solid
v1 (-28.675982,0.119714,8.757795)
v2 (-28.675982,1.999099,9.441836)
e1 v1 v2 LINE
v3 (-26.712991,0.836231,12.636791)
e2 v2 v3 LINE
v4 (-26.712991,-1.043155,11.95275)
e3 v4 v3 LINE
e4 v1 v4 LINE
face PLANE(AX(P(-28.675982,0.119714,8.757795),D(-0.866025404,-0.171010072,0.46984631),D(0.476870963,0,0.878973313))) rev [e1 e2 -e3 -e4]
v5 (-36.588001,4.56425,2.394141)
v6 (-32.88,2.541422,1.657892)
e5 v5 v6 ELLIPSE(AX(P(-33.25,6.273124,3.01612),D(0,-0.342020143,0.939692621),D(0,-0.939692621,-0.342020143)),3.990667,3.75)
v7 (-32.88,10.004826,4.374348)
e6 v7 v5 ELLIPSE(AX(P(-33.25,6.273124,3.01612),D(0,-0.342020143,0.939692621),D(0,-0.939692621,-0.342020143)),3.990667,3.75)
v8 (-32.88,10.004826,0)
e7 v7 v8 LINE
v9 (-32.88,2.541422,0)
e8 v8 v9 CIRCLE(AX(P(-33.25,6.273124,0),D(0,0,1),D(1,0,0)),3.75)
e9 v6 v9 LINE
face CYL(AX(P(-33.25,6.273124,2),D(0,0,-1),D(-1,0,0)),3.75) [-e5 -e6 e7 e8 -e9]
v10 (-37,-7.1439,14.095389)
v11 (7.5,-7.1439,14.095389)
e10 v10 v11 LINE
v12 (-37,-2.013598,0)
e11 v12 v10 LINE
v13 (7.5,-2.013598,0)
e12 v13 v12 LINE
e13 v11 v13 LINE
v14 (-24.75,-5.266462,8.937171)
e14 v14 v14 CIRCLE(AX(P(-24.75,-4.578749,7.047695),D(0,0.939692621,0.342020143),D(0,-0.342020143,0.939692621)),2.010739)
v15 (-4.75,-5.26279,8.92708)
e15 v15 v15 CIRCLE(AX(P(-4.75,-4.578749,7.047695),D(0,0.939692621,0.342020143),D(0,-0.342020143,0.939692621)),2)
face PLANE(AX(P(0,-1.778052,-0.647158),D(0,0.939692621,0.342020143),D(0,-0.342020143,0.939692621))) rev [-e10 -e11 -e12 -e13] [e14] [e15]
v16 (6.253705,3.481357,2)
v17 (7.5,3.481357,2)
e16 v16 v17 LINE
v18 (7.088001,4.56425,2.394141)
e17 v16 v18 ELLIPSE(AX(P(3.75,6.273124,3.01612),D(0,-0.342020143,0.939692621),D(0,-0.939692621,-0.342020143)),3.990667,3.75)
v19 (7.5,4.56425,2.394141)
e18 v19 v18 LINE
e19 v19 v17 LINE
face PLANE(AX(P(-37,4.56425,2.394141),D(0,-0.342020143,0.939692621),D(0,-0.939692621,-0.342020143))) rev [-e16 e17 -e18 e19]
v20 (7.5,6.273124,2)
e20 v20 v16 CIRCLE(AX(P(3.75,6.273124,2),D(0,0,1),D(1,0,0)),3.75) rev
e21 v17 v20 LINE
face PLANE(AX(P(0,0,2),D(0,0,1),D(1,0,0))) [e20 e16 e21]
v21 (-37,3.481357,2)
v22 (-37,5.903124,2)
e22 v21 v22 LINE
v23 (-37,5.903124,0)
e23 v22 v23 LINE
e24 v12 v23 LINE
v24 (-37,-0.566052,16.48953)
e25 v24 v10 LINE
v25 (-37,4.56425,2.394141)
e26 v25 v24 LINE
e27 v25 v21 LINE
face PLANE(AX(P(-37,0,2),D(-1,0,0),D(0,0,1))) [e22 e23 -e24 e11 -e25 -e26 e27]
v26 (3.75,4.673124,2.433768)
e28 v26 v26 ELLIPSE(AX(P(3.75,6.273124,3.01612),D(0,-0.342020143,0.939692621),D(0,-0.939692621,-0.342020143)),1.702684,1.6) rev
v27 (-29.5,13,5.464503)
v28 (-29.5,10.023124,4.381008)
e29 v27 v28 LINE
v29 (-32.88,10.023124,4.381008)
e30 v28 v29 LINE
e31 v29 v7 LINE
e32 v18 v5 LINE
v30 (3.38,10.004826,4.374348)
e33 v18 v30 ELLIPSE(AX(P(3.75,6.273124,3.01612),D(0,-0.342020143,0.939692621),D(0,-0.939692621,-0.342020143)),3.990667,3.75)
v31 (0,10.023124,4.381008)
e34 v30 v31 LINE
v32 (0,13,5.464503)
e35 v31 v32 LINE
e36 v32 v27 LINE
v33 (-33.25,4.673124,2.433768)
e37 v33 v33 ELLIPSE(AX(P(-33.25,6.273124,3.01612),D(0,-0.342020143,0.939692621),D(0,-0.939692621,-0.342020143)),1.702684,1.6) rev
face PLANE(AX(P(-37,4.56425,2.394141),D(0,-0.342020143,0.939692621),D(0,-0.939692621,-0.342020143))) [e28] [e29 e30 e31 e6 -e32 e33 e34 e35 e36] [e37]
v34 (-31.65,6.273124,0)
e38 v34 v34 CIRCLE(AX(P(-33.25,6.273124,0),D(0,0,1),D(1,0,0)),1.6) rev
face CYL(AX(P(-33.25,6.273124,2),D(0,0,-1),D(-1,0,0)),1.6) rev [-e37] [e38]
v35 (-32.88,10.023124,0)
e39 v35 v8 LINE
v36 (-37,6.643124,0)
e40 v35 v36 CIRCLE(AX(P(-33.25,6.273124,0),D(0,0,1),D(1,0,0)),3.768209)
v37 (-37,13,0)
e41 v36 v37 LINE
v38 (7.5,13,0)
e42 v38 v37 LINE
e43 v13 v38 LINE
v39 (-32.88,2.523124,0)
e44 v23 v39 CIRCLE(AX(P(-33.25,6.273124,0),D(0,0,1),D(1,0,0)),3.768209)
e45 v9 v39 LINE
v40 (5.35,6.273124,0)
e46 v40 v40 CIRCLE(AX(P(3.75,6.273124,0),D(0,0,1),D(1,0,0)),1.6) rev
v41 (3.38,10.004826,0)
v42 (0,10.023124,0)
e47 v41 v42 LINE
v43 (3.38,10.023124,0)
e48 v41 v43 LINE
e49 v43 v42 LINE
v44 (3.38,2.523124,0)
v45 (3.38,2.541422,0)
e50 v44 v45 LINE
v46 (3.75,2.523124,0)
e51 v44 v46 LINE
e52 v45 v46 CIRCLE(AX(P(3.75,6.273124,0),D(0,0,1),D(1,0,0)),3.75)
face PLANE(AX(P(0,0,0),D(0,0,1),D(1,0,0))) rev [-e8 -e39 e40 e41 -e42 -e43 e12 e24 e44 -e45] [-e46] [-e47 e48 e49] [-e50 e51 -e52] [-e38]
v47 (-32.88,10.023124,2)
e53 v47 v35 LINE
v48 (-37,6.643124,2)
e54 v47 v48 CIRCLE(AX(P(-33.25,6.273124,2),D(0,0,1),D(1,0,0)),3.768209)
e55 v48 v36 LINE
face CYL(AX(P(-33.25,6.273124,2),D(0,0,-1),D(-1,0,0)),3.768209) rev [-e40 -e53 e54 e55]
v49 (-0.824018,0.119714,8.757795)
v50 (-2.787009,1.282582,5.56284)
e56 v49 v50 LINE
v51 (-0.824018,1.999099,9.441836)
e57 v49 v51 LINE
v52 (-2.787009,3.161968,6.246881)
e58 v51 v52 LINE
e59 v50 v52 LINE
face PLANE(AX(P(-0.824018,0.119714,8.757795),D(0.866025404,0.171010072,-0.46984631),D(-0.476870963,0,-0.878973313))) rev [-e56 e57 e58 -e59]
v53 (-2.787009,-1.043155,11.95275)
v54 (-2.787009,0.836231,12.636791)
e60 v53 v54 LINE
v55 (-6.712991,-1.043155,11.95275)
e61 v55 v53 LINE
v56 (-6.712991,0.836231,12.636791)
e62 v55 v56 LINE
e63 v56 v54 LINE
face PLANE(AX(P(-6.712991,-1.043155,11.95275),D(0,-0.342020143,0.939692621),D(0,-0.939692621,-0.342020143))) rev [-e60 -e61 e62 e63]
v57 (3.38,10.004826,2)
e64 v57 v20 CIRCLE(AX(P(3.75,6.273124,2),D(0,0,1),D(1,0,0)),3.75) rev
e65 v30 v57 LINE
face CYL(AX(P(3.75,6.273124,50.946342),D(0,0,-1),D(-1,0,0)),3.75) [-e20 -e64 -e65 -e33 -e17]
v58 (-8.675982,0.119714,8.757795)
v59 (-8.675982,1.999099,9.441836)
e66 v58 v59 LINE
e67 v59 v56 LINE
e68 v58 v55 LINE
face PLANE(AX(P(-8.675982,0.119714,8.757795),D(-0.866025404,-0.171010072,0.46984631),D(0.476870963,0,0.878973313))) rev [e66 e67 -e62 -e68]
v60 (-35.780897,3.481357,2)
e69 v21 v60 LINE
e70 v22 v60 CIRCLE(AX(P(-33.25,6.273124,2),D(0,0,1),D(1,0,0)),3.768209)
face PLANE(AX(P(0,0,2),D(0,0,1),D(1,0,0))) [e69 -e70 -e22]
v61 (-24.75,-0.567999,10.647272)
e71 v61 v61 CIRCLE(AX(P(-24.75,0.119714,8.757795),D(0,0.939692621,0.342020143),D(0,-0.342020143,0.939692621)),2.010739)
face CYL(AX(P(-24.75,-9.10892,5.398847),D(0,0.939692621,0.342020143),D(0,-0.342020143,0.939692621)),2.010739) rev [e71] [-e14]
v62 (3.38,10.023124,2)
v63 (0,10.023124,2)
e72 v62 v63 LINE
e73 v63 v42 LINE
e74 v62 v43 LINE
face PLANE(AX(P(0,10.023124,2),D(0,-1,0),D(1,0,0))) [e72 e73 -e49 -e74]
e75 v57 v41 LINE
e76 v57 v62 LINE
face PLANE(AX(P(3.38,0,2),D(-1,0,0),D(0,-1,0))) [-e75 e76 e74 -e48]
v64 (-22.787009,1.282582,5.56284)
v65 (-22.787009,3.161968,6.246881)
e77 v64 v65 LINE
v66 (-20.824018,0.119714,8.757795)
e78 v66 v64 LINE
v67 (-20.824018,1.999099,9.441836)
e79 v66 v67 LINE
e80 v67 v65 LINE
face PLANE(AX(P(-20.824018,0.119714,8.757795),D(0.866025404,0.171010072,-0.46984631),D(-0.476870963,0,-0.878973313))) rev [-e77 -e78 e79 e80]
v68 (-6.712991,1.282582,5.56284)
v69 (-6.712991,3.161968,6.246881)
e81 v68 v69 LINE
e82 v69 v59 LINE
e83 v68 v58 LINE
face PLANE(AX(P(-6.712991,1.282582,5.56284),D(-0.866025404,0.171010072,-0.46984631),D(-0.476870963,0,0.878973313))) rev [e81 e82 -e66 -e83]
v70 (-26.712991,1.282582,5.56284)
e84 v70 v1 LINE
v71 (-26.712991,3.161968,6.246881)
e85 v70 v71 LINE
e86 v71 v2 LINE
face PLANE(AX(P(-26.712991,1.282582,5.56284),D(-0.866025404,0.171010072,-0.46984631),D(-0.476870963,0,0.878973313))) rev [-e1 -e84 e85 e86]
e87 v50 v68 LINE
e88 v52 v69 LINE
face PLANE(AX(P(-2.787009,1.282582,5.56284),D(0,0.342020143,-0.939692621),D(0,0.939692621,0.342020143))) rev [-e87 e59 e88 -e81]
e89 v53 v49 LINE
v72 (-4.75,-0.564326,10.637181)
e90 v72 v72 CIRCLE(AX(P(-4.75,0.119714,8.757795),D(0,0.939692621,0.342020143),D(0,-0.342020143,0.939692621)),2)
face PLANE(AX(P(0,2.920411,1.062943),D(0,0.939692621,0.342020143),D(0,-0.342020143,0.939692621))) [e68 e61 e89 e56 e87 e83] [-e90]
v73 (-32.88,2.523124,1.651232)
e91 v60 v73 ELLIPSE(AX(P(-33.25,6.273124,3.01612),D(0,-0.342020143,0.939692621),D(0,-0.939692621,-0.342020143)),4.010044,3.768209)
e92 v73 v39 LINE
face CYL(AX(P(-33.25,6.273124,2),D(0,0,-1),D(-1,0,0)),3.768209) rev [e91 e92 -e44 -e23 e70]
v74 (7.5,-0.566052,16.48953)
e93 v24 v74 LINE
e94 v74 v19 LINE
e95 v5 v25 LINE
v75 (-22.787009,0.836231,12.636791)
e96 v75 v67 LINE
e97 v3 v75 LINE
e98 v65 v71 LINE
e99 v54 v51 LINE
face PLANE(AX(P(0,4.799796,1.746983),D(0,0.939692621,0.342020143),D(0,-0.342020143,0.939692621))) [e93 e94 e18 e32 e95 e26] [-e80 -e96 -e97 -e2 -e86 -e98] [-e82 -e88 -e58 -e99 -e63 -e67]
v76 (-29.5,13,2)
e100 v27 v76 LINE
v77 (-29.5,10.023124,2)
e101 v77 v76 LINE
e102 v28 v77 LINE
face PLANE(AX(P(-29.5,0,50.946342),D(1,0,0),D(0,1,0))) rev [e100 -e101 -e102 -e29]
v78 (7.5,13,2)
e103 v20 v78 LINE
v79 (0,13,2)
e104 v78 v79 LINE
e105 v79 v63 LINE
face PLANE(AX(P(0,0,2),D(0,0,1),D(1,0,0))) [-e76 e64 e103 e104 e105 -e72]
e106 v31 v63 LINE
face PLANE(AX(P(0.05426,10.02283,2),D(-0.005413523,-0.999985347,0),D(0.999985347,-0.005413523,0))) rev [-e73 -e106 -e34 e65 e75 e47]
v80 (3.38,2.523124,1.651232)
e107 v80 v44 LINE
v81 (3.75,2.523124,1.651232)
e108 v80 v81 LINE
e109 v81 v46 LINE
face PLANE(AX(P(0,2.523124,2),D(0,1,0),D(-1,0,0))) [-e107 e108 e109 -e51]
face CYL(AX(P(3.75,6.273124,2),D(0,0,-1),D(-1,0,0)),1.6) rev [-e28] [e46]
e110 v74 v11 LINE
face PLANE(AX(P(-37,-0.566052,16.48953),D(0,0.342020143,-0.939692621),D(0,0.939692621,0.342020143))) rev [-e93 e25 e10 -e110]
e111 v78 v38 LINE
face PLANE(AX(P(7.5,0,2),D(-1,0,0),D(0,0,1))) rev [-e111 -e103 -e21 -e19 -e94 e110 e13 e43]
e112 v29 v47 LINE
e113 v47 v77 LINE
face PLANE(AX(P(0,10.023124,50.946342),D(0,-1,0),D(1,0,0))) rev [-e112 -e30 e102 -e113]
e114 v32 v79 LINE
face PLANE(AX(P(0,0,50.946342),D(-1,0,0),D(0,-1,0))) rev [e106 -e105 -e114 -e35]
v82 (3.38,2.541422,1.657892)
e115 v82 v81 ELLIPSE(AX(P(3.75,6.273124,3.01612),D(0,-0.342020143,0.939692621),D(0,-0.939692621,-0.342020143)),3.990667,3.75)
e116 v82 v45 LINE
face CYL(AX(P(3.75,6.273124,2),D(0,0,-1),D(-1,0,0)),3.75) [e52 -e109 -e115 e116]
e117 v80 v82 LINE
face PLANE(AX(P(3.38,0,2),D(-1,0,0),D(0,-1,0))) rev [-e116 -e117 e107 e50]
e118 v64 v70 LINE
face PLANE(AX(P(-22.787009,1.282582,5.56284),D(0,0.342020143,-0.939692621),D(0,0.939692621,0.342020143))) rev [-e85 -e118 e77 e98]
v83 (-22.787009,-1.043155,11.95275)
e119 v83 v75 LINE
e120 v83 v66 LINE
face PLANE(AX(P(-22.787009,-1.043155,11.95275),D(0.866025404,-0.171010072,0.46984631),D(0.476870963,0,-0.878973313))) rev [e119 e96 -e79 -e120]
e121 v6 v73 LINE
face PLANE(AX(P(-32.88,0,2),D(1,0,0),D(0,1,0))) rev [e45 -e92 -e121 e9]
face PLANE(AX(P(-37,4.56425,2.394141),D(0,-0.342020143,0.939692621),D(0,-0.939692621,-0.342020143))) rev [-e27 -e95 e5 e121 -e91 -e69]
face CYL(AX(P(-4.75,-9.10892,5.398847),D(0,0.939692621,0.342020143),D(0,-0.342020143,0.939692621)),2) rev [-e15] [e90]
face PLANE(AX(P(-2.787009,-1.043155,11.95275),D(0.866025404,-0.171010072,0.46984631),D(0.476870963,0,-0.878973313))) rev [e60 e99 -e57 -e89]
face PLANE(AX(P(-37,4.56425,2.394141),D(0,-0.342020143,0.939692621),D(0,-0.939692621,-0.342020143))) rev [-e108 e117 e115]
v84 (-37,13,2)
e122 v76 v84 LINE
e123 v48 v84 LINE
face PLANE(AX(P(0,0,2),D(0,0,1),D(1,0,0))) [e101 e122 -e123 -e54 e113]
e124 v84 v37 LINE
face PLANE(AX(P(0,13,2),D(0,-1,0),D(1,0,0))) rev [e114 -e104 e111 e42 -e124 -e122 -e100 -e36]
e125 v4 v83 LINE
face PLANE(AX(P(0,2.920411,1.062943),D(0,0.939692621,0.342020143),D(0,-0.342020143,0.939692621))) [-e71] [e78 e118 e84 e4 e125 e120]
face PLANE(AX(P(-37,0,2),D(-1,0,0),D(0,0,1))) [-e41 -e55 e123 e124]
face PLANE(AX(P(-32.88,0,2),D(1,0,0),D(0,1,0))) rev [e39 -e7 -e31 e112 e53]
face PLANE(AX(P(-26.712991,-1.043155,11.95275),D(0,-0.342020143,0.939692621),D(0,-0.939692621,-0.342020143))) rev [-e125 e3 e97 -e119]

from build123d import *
from build123d.topology import SkipClean

# Parameters (mm, degrees)
SKETCH2_R           = 1.6
SKETCH2_W           = 28.5
SKETCH2_H           = 12
BOSS_EXTRUDE1_DEPTH = 2
SKETCH3_W           = 44.5
SKETCH3_H           = 15
BOSS_EXTRUDE2_DEPTH = 7
BOSS_EXTRUDE3_REACH = 44.543
SKETCH2_3_R         = 1.6
SKETCH2_3_W         = 28.5
SKETCH2_3_H         = 12
SKETCH4_R           = 2.010738951
SKETCH4_R_2         = 2
CUT_EXTRUDE1_DEPTH  = 2
SKETCH4_2_R         = 2
SKETCH4_2_R_2       = 2.010738951
CUT_EXTRUDE2_DEPTH  = 42.581180746
BOSS_EXTRUDE4_DEPTH = 44.5


with BuildPart() as part:
    # Sketch2 → Boss-Extrude1 (new body)
    # profile 1 of 6: a face of its own
    with BuildSketch(Plane.XY):
        with BuildLine():
            ThreePointArc((3.38, 10.004825556), (6.267439172, 9.052511956), (7.5, 6.27312354))
            Line((7.5, 6.27312354), (7.5, 13))
            Line((7.5, 13), (0, 13))
            Line((0, 13), (0, 10.023123532))
            Line((0, 10.023123532), (3.38, 10.023123532))
            Line((3.38, 10.023123532), (3.38, 10.004825556))
        make_face()
    # profile 2 of 6: a face of its own
    with BuildSketch(Plane.XY):
        with BuildLine():
            Line((3.38, 2.523123532), (0, 2.523123532))
            Line((0, 2.523123532), (0, 0))
            Line((0, 0), (7.5, 0))
            Line((7.5, 0), (7.5, 6.27312354))
            ThreePointArc((7.5, 6.27312354), (6.401650432, 3.621473105), (3.75, 2.523123532))
            Line((3.75, 2.523123532), (3.725156678, 2.523123532))
            Line((3.725156678, 2.523123532), (3.38, 2.523123532))
        make_face()
    # profile 3 of 6: a face of its own
    with BuildSketch(Plane.XY):
        with BuildLine():
            Line((-37, 13), (-37, 6.643123532))
            ThreePointArc((-37, 6.643123532), (-35.64002092, 9.18640347), (-32.88, 10.023123532))
            Line((-32.88, 10.023123532), (-29.5, 10.023123532))
            Line((-29.5, 10.023123532), (-29.5, 13))
            Line((-29.5, 13), (-37, 13))
        make_face()
    # profile 4 of 6: a face of its own
    with BuildSketch(Plane.XY):
        with BuildLine():
            Line((-37, 0), (-29.5, 0))
            Line((-29.5, 0), (-29.5, 2.523123532))
            Line((-29.5, 2.523123532), (-32.88, 2.523123532))
            ThreePointArc((-32.88, 2.523123532), (-35.64002092, 3.359843593), (-37, 5.903123532))
            Line((-37, 5.903123532), (-37, 0))
        make_face()
    # profile 5 of 6: a face of its own
    with BuildSketch(Plane.XY):
        with BuildLine():
            Line((3.38, 10.004825556), (0, 10.023123532))
            Line((0, 10.023123532), (0, 13))
            Line((0, 13), (-29.5, 13))
            Line((-29.5, 13), (-29.5, 10.023123532))
            Line((-29.5, 10.023123532), (-32.88, 10.023123532))
            Line((-32.88, 10.023123532), (-32.88, 10.004825556))
            ThreePointArc((-32.88, 10.004825556), (-37, 6.273123532), (-32.88, 2.541421507))
            Line((-32.88, 2.541421507), (-32.88, 2.523123532))
            Line((-32.88, 2.523123532), (-29.5, 2.523123532))
            Line((-29.5, 2.523123532), (-29.5, 0))
            Line((-29.5, 0), (0, 0))
            Line((0, 0), (0, 2.523123532))
            Line((0, 2.523123532), (3.38, 2.523123532))
            Line((3.38, 2.523123532), (3.38, 2.541421507))
            ThreePointArc((3.38, 2.541421507), (7.5, 6.273123532), (3.38, 10.004825556))
        make_face()
        with Locations((3.75, 6.273123532)):
            Circle(SKETCH2_R, mode=Mode.SUBTRACT)
        with Locations((-33.25, 6.273123532)):
            Circle(SKETCH2_R, mode=Mode.SUBTRACT)
        with Locations((-14.75, 6.5)):
            Rectangle(SKETCH2_W, SKETCH2_H, mode=Mode.SUBTRACT)
    # profile 6 of 6: a face of its own
    with BuildSketch(Plane.XY):
        with Locations((-14.75, 6.5)):
            Rectangle(SKETCH2_W, SKETCH2_H)
    extrude(amount=BOSS_EXTRUDE1_DEPTH)

    # Sketch3 → Boss-Extrude2 (add)
    with BuildSketch(Plane(origin=(0, -1.778051923, -0.647157975), x_dir=(1, 0, 0), z_dir=(-1.5523980964466968e-15, 0.9396926207859094, 0.34202014332566594))):
        with Locations((-14.75, -8.188691132)):
            Rectangle(SKETCH3_W, SKETCH3_H)
    extrude(amount=BOSS_EXTRUDE2_DEPTH)

    # Boss-Extrude3: up to this plane
    with SkipClean():  # the faces are left unmerged after this step: merging them gives an invalid solid
        boss_extrude3_end = Plane(origin=(-37, 4.564250183, 2.394141003), z_dir=(0, -0.34202014332566594, 0.9396926207859094))
        # Sketch2<3> → Boss-Extrude3 (add, up to the surface)
        with BuildSketch(Plane.XY, mode=Mode.PRIVATE) as boss_extrude3_sk1:
            with BuildLine():
                Line((3.38, 10.004825556), (0, 10.023123532))
                Line((0, 10.023123532), (0, 13))
                Line((0, 13), (-29.5, 13))
                Line((-29.5, 13), (-29.5, 10.023123532))
                Line((-29.5, 10.023123532), (-32.88, 10.023123532))
                Line((-32.88, 10.023123532), (-32.88, 10.004825556))
                ThreePointArc((-32.88, 10.004825556), (-37, 6.273123532), (-32.88, 2.541421507))
                Line((-32.88, 2.541421507), (-32.88, 2.523123532))
                Line((-32.88, 2.523123532), (-29.5, 2.523123532))
                Line((-29.5, 2.523123532), (-29.5, 0))
                Line((-29.5, 0), (0, 0))
                Line((0, 0), (0, 2.523123532))
                Line((0, 2.523123532), (3.38, 2.523123532))
                Line((3.38, 2.523123532), (3.38, 2.541421507))
                ThreePointArc((3.38, 2.541421507), (7.5, 6.273123532), (3.38, 10.004825556))
            make_face()
            with Locations(Location((3.75, 6.273123532, 0), (0, 0, 270))):
                Circle(SKETCH2_3_R, mode=Mode.SUBTRACT)
            with Locations(Location((-33.25, 6.273123532, 0), (0, 0, 270))):
                Circle(SKETCH2_3_R, mode=Mode.SUBTRACT)
            with Locations((-14.75, 6.5)):
                Rectangle(SKETCH2_3_W, SKETCH2_3_H, mode=Mode.SUBTRACT)
        boss_extrude3_tool1 = split(extrude(boss_extrude3_sk1.sketch, amount=BOSS_EXTRUDE3_REACH, mode=Mode.PRIVATE), bisect_by=boss_extrude3_end, keep=Keep.BOTH, mode=Mode.PRIVATE)
        add(boss_extrude3_tool1.solids().sort_by_distance((1.68749, 9.550381, 0))[0])
        # Sketch2<3> → Boss-Extrude3 (add, up to the surface)
        with BuildSketch(Plane.XY, mode=Mode.PRIVATE) as boss_extrude3_sk2:
            with Locations((-14.75, 6.5)):
                Rectangle(SKETCH2_3_W, SKETCH2_3_H)
        boss_extrude3_tool2 = split(extrude(boss_extrude3_sk2.sketch, amount=BOSS_EXTRUDE3_REACH, mode=Mode.PRIVATE), bisect_by=boss_extrude3_end, keep=Keep.BOTH, mode=Mode.PRIVATE)
        add(boss_extrude3_tool2.solids().sort_by_distance((-14.75, 6.5, 0))[0])

    # Sketch4 → Cut-Extrude1 (cut)
    # profile 1 of 2: a face of its own
    with SkipClean():  # the faces are left unmerged after this step: merging them gives an invalid solid
        with BuildSketch(Plane(origin=(0, 4.799796423, 1.746983028), x_dir=(1, 0, 0), z_dir=(-1.5524032942846936e-15, 0.9396926207859094, 0.34202014332566594))):
            Polygon((-28.67598183, -8.188691132), (-26.712990915, -11.588691132), (-22.787009085, -11.588691132), (-20.82401817, -8.188691132), (-22.787009085, -4.788691132), (-26.712990915, -4.788691132), align=None)
            with Locations(Location((-24.75, -8.188691132, 0), (0, 0, 270))):
                Circle(SKETCH4_R, mode=Mode.SUBTRACT)
        # profile 2 of 2: a face of its own
        with BuildSketch(Plane(origin=(0, 4.799796423, 1.746983028), x_dir=(1, 0, 0), z_dir=(-1.5524032942846936e-15, 0.9396926207859094, 0.34202014332566594))):
            Polygon((-8.67598183, -8.188691132), (-6.712990915, -11.588691132), (-2.787009085, -11.588691132), (-0.82401817, -8.188691132), (-2.787009085, -4.788691132), (-6.712990915, -4.788691132), align=None)
            with Locations(Location((-4.75, -8.188691132, 0), (0, 0, 270))):
                Circle(SKETCH4_R_2, mode=Mode.SUBTRACT)
        extrude(amount=-CUT_EXTRUDE1_DEPTH, mode=Mode.SUBTRACT)

    # Sketch4<2> → Cut-Extrude2 (cut, through all)
    with SkipClean():  # the faces are left unmerged after this step: merging them gives an invalid solid
        with BuildSketch(Plane(origin=(0, 4.799796423, 1.746983028), x_dir=(1, 0, 0), z_dir=(-1.5524032942846936e-15, 0.9396926207859094, 0.34202014332566594))):
            with Locations(Location((-4.75, -8.188691132, 0), (0, 0, 270))):
                Circle(SKETCH4_2_R)
            with Locations(Location((-24.75, -8.188691132, 0), (0, 0, 270))):
                Circle(SKETCH4_2_R_2)
        extrude(amount=-CUT_EXTRUDE2_DEPTH, mode=Mode.SUBTRACT)

    # Sketch5 → Boss-Extrude4 (add)
    with SkipClean():  # the faces are left unmerged after this step: merging them gives an invalid solid
        with BuildSketch(Plane(origin=(7.5, 0, 0), x_dir=(0, 0, -1), z_dir=(1, 0, 0))):
            Polygon((-0.732889795, 0), (0, 0), (0, -2.013598163), align=None)
        extrude(amount=-BOSS_EXTRUDE4_DEPTH)


solid = part.part
